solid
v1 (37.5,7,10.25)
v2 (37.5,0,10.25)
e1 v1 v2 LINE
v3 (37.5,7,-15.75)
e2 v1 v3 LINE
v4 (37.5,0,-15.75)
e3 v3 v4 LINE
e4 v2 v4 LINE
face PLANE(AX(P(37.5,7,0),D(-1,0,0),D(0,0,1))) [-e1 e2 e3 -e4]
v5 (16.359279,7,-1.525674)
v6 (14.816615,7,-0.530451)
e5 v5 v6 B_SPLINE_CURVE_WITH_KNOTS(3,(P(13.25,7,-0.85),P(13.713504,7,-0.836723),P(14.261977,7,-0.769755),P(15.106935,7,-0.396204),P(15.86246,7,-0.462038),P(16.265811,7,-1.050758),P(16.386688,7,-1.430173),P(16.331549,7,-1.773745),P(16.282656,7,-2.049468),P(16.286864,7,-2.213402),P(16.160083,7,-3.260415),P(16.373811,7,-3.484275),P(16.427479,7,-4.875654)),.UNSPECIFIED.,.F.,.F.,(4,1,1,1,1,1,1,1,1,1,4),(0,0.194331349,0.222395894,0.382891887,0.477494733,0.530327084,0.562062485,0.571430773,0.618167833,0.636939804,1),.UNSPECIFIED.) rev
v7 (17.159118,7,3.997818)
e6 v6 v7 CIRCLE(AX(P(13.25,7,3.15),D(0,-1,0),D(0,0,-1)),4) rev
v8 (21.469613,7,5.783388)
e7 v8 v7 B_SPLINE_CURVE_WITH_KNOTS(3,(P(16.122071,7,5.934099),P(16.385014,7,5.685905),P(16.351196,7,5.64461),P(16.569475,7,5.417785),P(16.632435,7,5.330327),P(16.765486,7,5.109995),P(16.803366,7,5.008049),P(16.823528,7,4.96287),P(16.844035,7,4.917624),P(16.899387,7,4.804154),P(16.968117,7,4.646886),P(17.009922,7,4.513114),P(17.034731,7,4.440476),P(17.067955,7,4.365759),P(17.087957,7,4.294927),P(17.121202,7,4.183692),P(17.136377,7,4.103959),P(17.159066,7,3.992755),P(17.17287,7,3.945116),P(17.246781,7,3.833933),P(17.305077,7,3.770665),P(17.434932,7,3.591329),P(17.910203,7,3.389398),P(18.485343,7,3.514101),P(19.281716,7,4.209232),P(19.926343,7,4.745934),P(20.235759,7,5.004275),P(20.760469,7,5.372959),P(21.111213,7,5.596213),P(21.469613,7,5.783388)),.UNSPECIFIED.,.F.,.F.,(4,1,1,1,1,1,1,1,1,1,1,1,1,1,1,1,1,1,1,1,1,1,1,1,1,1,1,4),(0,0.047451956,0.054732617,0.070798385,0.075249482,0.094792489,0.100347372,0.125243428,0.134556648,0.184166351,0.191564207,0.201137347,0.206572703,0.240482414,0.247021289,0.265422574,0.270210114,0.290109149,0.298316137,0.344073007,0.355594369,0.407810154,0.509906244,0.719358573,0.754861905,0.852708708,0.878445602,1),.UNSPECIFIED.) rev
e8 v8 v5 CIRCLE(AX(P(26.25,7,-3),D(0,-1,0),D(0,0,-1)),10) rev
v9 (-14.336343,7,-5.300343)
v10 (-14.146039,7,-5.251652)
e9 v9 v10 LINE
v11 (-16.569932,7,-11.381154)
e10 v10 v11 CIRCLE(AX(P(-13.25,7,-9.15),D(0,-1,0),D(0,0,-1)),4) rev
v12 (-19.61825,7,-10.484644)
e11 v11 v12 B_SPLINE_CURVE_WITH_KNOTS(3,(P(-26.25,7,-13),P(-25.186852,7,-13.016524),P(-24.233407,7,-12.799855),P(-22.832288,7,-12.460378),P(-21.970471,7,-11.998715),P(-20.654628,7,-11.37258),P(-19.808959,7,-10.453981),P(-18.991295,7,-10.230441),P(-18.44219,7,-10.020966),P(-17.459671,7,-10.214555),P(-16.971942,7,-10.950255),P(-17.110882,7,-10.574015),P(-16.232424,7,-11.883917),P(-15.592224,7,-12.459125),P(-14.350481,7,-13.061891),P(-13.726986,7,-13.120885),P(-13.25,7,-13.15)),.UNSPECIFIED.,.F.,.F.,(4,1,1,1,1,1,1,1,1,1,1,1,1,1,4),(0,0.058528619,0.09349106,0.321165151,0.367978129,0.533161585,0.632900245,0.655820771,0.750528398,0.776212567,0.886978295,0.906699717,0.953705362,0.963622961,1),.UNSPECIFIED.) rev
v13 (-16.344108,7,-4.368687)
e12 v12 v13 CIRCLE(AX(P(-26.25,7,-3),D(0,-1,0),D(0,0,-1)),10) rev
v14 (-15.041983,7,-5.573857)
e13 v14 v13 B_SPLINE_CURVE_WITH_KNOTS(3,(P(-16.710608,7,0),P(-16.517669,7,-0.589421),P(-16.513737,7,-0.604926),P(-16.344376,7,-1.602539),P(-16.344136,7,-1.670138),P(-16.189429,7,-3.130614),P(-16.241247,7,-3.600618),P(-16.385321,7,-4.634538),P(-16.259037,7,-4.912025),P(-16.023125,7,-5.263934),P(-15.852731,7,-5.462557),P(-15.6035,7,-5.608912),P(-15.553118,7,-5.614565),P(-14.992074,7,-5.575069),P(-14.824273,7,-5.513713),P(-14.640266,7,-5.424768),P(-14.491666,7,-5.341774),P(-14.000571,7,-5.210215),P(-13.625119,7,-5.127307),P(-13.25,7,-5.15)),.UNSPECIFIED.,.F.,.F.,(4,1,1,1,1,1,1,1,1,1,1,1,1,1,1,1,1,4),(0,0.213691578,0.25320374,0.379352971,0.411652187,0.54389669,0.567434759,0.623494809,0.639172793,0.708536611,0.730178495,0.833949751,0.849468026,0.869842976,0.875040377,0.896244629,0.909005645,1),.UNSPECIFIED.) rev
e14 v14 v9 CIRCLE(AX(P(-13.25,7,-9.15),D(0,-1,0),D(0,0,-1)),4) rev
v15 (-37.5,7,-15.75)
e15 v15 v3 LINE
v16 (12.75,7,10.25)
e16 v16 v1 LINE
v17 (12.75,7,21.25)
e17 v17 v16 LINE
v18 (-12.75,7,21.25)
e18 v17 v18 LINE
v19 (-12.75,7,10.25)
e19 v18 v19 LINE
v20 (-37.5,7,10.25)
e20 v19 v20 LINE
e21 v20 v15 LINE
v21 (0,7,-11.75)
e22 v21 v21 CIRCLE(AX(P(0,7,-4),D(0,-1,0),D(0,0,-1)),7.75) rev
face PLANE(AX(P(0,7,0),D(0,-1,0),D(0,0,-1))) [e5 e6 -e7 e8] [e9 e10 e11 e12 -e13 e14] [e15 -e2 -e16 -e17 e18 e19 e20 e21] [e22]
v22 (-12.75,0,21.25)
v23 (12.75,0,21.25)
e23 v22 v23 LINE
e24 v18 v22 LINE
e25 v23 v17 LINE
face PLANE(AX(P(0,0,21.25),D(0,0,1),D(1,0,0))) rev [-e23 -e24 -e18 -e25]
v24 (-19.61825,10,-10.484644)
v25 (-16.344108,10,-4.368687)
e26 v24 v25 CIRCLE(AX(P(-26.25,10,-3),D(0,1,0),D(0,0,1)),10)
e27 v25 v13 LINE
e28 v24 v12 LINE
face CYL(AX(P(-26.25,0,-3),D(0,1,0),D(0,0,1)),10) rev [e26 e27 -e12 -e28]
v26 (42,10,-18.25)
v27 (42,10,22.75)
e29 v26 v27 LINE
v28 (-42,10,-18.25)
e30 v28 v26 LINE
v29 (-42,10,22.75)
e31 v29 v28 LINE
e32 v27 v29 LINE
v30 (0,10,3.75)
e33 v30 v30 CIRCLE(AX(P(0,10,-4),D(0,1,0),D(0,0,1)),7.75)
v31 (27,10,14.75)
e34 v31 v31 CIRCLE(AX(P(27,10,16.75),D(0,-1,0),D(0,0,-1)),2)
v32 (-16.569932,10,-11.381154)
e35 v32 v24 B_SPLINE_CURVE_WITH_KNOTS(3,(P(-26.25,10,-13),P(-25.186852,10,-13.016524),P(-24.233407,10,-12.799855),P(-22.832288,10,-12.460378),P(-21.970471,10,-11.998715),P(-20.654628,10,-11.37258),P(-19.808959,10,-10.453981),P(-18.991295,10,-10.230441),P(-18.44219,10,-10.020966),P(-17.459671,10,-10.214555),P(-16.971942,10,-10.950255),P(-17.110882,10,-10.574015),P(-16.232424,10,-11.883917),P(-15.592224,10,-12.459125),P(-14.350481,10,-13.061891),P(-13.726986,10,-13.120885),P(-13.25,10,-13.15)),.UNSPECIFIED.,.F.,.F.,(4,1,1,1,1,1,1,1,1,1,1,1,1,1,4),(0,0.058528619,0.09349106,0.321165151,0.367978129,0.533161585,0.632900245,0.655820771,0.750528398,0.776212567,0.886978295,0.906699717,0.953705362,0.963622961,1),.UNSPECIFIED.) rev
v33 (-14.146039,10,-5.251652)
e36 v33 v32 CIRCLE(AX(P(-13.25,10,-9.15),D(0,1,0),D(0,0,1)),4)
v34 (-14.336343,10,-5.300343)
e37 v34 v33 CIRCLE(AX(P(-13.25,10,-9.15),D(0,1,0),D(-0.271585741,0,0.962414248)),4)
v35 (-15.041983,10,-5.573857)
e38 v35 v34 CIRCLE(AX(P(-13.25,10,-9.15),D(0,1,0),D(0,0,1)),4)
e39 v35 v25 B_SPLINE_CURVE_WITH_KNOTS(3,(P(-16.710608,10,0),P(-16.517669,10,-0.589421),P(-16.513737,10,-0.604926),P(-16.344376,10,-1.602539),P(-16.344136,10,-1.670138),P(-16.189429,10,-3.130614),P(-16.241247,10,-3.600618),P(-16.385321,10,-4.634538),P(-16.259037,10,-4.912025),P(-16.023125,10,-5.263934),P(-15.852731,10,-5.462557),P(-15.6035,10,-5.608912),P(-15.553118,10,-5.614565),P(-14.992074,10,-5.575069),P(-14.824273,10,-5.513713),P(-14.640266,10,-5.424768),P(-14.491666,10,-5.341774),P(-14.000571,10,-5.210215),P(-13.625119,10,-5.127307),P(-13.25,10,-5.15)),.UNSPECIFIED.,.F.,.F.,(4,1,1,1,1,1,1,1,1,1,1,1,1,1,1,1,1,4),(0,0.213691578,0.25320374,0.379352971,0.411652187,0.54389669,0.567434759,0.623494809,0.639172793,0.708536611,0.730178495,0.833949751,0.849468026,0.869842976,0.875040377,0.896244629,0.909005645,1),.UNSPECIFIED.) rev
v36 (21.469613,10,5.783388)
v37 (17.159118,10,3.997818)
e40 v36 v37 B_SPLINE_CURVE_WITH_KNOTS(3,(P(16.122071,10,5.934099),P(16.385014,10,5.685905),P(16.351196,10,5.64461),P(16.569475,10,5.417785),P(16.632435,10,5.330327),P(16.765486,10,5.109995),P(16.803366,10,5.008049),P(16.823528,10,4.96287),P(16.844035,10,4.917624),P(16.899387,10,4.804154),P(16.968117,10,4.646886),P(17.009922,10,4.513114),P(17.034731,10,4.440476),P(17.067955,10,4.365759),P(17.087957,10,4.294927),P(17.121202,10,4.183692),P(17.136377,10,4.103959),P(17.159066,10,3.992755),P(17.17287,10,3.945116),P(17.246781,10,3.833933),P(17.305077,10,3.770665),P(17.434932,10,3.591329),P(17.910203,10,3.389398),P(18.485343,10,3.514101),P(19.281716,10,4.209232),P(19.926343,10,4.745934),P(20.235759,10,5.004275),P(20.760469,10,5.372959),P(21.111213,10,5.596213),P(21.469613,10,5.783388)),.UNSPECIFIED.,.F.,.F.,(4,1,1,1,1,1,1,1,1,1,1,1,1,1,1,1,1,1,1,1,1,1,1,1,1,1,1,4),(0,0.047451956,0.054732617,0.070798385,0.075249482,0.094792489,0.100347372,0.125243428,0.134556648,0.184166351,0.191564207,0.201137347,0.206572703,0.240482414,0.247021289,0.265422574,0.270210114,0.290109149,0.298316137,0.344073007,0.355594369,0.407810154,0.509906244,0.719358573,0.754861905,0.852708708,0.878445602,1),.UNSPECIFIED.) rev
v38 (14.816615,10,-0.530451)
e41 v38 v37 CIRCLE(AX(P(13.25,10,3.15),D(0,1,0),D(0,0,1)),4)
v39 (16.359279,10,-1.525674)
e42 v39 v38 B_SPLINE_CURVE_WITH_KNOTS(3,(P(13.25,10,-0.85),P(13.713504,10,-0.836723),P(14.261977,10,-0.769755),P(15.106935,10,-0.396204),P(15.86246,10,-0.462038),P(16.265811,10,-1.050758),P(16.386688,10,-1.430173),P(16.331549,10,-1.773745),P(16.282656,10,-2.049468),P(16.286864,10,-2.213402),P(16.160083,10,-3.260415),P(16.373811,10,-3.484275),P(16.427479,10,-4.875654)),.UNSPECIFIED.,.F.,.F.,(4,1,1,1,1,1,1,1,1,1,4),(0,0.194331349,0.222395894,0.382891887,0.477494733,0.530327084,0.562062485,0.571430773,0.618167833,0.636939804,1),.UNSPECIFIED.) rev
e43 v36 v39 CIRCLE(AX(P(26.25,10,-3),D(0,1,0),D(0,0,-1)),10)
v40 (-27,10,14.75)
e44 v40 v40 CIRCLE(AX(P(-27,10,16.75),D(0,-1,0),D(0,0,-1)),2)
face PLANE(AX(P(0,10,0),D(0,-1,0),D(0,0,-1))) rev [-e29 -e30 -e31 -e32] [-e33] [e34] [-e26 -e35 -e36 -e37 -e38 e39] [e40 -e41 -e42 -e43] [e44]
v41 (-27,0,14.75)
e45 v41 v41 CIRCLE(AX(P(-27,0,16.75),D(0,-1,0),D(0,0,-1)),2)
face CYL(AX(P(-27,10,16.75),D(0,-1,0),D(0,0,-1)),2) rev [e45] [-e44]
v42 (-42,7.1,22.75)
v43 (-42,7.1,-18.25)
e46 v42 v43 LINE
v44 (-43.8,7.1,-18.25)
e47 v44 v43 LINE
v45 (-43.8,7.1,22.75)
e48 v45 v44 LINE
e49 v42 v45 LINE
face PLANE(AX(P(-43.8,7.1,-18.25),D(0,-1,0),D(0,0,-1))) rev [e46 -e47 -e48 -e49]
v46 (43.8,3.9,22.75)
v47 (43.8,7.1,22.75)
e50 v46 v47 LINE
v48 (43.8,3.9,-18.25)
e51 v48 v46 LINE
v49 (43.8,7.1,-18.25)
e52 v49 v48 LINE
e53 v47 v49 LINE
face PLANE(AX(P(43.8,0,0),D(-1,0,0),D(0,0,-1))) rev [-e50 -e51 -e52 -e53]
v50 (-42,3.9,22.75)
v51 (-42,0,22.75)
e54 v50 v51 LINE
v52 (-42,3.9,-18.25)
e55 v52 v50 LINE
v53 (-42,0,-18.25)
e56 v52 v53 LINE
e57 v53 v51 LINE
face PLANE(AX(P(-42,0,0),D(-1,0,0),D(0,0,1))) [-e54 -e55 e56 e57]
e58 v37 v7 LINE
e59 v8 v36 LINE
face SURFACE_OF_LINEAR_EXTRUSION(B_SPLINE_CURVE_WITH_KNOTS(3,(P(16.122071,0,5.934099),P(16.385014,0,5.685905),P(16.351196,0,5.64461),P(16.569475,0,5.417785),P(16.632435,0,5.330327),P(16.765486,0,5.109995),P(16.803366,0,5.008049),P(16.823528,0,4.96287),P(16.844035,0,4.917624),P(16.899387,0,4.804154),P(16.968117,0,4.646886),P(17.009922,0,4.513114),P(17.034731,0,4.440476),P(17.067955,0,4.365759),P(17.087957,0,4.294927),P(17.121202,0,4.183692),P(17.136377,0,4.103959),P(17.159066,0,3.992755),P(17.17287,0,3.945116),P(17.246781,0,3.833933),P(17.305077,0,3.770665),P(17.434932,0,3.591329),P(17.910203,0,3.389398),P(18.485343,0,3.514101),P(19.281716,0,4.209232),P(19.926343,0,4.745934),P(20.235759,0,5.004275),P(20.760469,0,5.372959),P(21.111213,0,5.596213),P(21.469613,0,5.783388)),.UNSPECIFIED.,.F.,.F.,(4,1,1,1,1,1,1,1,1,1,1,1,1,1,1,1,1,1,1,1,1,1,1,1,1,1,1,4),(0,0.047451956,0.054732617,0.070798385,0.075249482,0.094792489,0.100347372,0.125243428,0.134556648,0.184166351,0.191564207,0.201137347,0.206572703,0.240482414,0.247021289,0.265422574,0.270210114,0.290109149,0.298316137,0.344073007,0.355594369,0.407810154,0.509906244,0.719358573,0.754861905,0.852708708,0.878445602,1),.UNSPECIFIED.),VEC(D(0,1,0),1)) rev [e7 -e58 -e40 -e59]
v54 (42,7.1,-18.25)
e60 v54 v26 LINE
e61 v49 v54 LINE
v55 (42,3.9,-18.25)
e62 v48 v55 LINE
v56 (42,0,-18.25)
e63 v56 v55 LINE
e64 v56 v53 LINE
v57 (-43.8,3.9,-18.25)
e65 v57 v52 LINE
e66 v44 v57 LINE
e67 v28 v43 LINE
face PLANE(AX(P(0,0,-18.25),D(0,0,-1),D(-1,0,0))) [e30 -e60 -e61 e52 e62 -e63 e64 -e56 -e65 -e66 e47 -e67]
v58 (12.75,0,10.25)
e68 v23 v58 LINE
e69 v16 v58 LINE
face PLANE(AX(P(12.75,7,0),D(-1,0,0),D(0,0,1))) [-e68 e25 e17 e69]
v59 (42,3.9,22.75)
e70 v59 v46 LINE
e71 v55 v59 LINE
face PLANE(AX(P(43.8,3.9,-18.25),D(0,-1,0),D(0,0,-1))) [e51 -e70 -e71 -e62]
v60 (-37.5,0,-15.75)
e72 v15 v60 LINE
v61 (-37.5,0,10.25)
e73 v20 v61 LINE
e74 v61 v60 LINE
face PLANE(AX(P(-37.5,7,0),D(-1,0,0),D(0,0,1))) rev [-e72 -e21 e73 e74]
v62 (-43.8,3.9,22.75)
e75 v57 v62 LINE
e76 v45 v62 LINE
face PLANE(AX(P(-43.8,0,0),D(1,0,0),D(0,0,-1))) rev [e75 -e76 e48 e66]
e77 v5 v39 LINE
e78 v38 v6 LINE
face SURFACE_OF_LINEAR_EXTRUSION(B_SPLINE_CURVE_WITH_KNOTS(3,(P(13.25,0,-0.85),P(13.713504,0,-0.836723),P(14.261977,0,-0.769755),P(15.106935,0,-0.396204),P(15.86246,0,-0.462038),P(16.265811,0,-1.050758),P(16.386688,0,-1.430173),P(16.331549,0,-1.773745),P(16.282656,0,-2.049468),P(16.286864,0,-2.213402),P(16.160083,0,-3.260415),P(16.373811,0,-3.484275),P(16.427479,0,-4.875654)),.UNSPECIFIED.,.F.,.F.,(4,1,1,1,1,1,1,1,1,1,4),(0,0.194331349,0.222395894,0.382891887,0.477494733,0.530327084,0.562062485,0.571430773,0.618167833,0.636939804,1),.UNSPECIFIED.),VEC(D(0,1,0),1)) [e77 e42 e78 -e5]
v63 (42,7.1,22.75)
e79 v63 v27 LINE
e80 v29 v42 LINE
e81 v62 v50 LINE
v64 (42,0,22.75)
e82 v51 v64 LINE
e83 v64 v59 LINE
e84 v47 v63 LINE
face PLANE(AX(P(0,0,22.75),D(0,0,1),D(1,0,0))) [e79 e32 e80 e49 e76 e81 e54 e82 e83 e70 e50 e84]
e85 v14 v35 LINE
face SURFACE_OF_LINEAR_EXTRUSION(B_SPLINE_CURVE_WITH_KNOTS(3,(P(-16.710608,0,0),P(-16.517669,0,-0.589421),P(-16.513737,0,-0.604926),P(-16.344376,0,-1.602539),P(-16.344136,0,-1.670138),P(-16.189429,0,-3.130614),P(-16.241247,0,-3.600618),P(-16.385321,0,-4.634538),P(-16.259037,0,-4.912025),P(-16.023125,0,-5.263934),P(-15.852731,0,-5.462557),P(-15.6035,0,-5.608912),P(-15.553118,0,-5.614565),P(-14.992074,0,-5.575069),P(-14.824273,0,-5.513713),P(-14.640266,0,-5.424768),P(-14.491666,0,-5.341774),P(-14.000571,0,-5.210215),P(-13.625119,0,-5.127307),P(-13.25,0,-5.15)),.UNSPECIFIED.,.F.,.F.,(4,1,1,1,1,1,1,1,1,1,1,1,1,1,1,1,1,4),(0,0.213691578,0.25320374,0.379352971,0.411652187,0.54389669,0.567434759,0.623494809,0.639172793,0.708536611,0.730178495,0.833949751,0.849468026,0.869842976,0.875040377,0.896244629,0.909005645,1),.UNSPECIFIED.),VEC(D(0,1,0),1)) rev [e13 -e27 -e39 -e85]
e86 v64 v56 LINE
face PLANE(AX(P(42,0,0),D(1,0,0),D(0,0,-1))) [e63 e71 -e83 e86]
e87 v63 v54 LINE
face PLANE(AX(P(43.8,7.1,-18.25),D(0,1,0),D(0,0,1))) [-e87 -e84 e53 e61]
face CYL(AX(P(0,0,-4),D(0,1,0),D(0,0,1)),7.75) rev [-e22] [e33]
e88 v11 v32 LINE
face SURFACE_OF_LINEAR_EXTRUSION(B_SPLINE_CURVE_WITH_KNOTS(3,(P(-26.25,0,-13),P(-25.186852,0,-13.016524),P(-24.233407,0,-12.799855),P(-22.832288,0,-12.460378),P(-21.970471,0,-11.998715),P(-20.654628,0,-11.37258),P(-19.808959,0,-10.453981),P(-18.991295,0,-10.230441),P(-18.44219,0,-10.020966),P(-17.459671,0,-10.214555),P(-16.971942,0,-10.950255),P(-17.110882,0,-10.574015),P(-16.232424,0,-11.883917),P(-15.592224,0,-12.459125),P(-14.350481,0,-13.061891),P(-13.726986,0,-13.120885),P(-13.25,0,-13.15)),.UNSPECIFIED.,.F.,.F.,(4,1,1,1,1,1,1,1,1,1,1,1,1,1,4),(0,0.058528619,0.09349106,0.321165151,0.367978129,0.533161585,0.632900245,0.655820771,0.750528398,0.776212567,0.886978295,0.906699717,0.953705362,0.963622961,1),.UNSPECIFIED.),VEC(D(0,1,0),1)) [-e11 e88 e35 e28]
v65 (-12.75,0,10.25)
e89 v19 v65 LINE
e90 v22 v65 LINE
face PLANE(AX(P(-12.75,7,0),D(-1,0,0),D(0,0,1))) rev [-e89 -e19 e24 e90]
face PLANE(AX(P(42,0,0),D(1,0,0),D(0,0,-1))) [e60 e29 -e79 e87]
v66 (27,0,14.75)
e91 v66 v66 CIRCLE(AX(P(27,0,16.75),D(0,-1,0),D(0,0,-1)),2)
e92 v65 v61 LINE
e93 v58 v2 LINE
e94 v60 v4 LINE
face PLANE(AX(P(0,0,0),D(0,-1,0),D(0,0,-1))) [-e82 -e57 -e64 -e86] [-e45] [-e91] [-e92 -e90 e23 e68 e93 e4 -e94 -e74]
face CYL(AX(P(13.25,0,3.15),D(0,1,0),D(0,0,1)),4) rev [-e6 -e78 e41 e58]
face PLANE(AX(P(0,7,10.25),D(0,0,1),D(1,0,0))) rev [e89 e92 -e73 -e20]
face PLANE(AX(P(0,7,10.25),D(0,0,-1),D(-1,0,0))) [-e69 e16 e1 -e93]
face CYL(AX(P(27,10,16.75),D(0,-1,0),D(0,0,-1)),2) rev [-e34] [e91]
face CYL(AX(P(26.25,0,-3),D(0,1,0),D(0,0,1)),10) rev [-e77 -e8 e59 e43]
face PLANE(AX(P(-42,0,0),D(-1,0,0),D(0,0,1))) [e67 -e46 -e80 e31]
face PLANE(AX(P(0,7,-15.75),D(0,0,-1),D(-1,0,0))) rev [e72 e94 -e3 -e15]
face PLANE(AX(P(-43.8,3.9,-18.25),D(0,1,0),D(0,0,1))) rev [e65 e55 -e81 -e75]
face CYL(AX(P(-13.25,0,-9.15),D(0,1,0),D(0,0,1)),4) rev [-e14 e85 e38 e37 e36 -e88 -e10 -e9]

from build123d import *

# Parameters (mm, degrees)
SKETCH1_W                   = 75
SKETCH1_H                   = 26.5
BASE_01_DEPTH               = 10
SKETCH4_R                   = 7.75
SKETCH4_R_2                 = 10
SKETCH4_R_3                 = 4
CAMERA_LIGHTS_DEPTH         = 42.00990734
SKETCH5_W                   = 75
SKETCH5_H                   = 10
UPPER_SIDE_SUPPORT_DEPTH    = 5
SKETCH6_W                   = 31.5
SKETCH6_H                   = 10
LEFT_SIDE_SUPPORT_DEPTH     = 4.5
SKETCH7_W                   = 31.5
SKETCH7_H                   = 10
RIGHT_SIDE_SUPPORT_DEPTH    = 4.5
SKETCH8_W                   = 75
SKETCH8_H                   = 2.5
BASE_01_CUT_DEPTH           = 7
SKETCH10_W                  = 31.5
SKETCH10_H                  = 3.2
LEFT_SIDE_BODY_HOLDER_DEPTH = 1.8
LOWER_BASE_SUPPORT_DEPTH    = 9.5
SKETCH12_W                  = 25.5
SKETCH12_H                  = 7
CAMERA_WIRE_EXT_CUT_DEPTH   = 1.5
SKETCH13_R                  = 2
CAMERA_HOLDING_HOLES_DEPTH  = 51.35873807
IR_START                    = -3
IR_FIT_CUT_DEPTH            = 3
IR_FIT_CUT_2_DEPTH          = 3


# Read off the part's stored shape, not the designer's step: IR Fit Cut
with BuildPart() as part:
    # Sketch1 → Base 01 (new body)
    with BuildSketch(Plane(origin=(0, 0, 0), x_dir=(1, 0, 0), z_dir=(0, 1, 0))):
        Rectangle(SKETCH1_W, SKETCH1_H)
    extrude(amount=BASE_01_DEPTH)

    # Sketch4 → Camera & lights (cut, through all)
    with BuildSketch(Plane(origin=(0, 10, 0), x_dir=(1, 0, 0), z_dir=(0, 1, 0))):
        with Locations(Location((0, 4, 0), (0, 0, 270))):
            Circle(SKETCH4_R)
        with Locations(Location((-26.25, 3, 0), (0, 0, 270))):
            Circle(SKETCH4_R_2)
        with Locations(Location((26.25, 3, 0), (0, 0, 90))):
            Circle(SKETCH4_R_2)
        with Locations(Location((-13.25, 9.15, 0), (0, 0, 270))):
            Circle(SKETCH4_R_3)
        with Locations(Location((13.25, -3.15, 0), (0, 0, 270))):
            Circle(SKETCH4_R_3)
    extrude(amount=-CAMERA_LIGHTS_DEPTH, mode=Mode.SUBTRACT)

    # Sketch5 → Upper side support (add)
    with BuildSketch(Plane(origin=(0, 0, -13.25), x_dir=(-1, 0, 0), z_dir=(0, 0, -1))):
        with Locations((0, 5)):
            Rectangle(SKETCH5_W, SKETCH5_H)
    extrude(amount=UPPER_SIDE_SUPPORT_DEPTH)

    # Sketch6 → Left Side Support (add)
    with BuildSketch(Plane.ZY.offset(37.5)):
        with Locations((-2.5, 5)):
            Rectangle(SKETCH6_W, SKETCH6_H)
    extrude(amount=LEFT_SIDE_SUPPORT_DEPTH)

    # Sketch7 → Right Side Support (add)
    with BuildSketch(Plane(origin=(37.5, 0, 0), x_dir=(0, 0, -1), z_dir=(1, 0, 0))):
        with Locations((2.5, 5)):
            Rectangle(SKETCH7_W, SKETCH7_H)
    extrude(amount=RIGHT_SIDE_SUPPORT_DEPTH)

    # Sketch8 → Base 01 Cut (cut)
    with BuildSketch(Plane.XZ):
        with Locations((0, -14.5)):
            Rectangle(SKETCH8_W, SKETCH8_H)
        Polygon((-37.5, 10.25), (-37.5, -13.25), (37.5, -13.25), (37.5, 10.25), (12.75, 10.25), (12.75, 13.25), (-12.75, 13.25), (-12.75, 10.25), align=None)
    extrude(amount=-BASE_01_CUT_DEPTH, mode=Mode.SUBTRACT)

    # Sketch10 → Left Side body Holder (add)
    with BuildSketch(Plane.ZY.offset(42)):
        with Locations((-2.5, 5.5)):
            Rectangle(SKETCH10_W, SKETCH10_H)
    left_side_body_holder = extrude(amount=LEFT_SIDE_BODY_HOLDER_DEPTH)

    # Right Side body Holder: Left Side body Holder across plane
    add(left_side_body_holder.mirror(Plane(origin=(0, 0, 0), x_dir=(0, 0, 1), z_dir=(1, 0, 0))))

    # Sketch11 → Lower base support (add)
    with BuildSketch(Plane.XY.offset(13.25)):
        Polygon((42, 3.9), (43.8, 3.9), (43.8, 7.1), (42, 7.1), (42, 10), (-42, 10), (-42, 7.1), (-43.8, 7.1), (-43.8, 3.9), (-42, 3.9), (-42, 0), (-12.75, 0), (-12.75, 7), (12.75, 7), (12.75, 0), (42, 0), align=None)
    extrude(amount=LOWER_BASE_SUPPORT_DEPTH)

    # Sketch12 → Camera Wire Ext cut (add)
    with BuildSketch(Plane.XY.offset(22.75)):
        with Locations((0, 3.5)):
            Rectangle(SKETCH12_W, SKETCH12_H)
    extrude(amount=-CAMERA_WIRE_EXT_CUT_DEPTH)

    # Sketch13 → Camera Holding Holes (cut, through all)
    with BuildSketch(Plane.XZ):
        with Locations(Location((27, 16.75, 0), (0, 0, 270))):
            Circle(SKETCH13_R)
        with Locations(Location((-27, 16.75, 0), (0, 0, 270))):
            Circle(SKETCH13_R)
    extrude(amount=-CAMERA_HOLDING_HOLES_DEPTH, mode=Mode.SUBTRACT)

    # IR Fit Cut outline → IR Fit Cut (cut)
    with BuildSketch(Plane(origin=(0, 10, 0), x_dir=(1, 0, 0), z_dir=(0, 1, 0)).offset(IR_START)):
        with BuildLine():
            ThreePointArc((14.81661521, 0.530450623), (16.802776188, -1.31212586), (17.159118071, -3.99781832))
            add(Edge.make_bspline(
                [(17.159118071, -3.99781832), (17.166278119, -3.969934013), (17.178337476, -3.936891555), (17.246780801, -3.833932894), (17.305076574, -3.770665125), (17.4349321, -3.591329111), (17.910202533, -3.389398307), (18.485343295, -3.51410072), (19.253649785, -4.184734467), (19.696093453, -4.554177367), (19.740193994, -4.590943668)],
                knots=[0.275674193, 0.275674193, 0.275674193, 0.275674193, 0.290109149, 0.298316137, 0.344073007, 0.355594369, 0.407810154, 0.509906244, 0.719358573, 0.742631054, 0.742631054, 0.742631054, 0.742631054], degree=3))
            ThreePointArc((19.740193994, -4.590943668), (17.497995952, -1.83760531), (16.359278951, 1.525674007))
            add(Edge.make_bspline(
                [(14.81661521, 0.530450623), (15.181815782, 0.40272852), (15.86245956, 0.462037657), (16.265810628, 1.050757555), (16.365277346, 1.362969111), (16.359278951, 1.525674007)],
                knots=[0.222395894, 0.222395894, 0.222395894, 0.222395894, 0.382891887, 0.477494733, 0.530327084, 0.530327084, 0.530327084, 0.530327084], degree=3))
        make_face()
        with BuildLine():
            ThreePointArc((21.469612645, -5.783387543), (20.701388337, -5.319429584), (19.977853966, -4.788464812))
            add(Edge.make_bspline(
                [(19.977853966, -4.788464812), (20.110594541, -4.897809063), (20.298403446, -5.048291915), (20.760469103, -5.372959062), (21.111213366, -5.596213213), (21.469612645, -5.783387543)],
                knots=[0.784128545, 0.784128545, 0.784128545, 0.784128545, 0.852708708, 0.878445602, 1, 1, 1, 1], degree=3))
        make_face()
        with BuildLine():
            ThreePointArc((-19.618250253, 10.484643966), (-17.433842543, 7.71967877), (-16.344107974, 4.368686656))
            add(Edge.make_bspline(
                [(-16.344107974, 4.368686656), (-16.346786074, 4.400652489), (-16.363410494, 4.682682191), (-16.259037035, 4.912025365), (-16.023124853, 5.263934466), (-15.852731431, 5.462556558), (-15.60349989, 5.608912133), (-15.554028579, 5.614463051), (-15.094185027, 5.582253589), (-15.041983124, 5.573857318)],
                knots=[0.560427253, 0.560427253, 0.560427253, 0.560427253, 0.567434759, 0.623494809, 0.639172793, 0.708536611, 0.730178495, 0.833949751, 0.846921158, 0.846921158, 0.846921158, 0.846921158], degree=3))
            ThreePointArc((-15.041983124, 5.573857318), (-17.118345184, 8.132205554), (-16.569932259, 11.381154364))
            add(Edge.make_bspline(
                [(-19.618250253, 10.484643966), (-19.339728391, 10.325698426), (-18.991295195, 10.23044062), (-18.442190237, 10.020965988), (-17.459671267, 10.214555154), (-16.971941729, 10.950254946), (-17.098342068, 10.607973515), (-16.595700977, 11.343869746), (-16.569932259, 11.381154364)],
                knots=[0.533161585, 0.533161585, 0.533161585, 0.533161585, 0.632900245, 0.655820771, 0.750528398, 0.776212567, 0.886978295, 0.892604255, 0.892604255, 0.892604255, 0.892604255], degree=3))
        make_face()
    extrude(amount=IR_FIT_CUT_DEPTH, mode=Mode.SUBTRACT)

    # IR Fit Cut 2 outline → IR Fit Cut 2 (add)
    with BuildSketch(Plane(origin=(0, 10, 0), x_dir=(1, 0, 0), z_dir=(0, 1, 0)).offset(IR_START)):
        with BuildLine():
            add(Edge.make_bspline(
                [(19.740193994, -4.590943668), (19.76337103, -4.610266194), (19.841872549, -4.675657908), (19.921206817, -4.741802064), (19.977853966, -4.788464812)],
                knots=[0.742631054, 0.742631054, 0.742631054, 0.742631054, 0.754861905, 0.784128545, 0.784128545, 0.784128545, 0.784128545], degree=3))
            ThreePointArc((19.740193994, -4.590943668), (19.858260946, -4.690622333), (19.977853966, -4.788464812))
        make_face()
    extrude(amount=IR_FIT_CUT_2_DEPTH)


solid = part.part
